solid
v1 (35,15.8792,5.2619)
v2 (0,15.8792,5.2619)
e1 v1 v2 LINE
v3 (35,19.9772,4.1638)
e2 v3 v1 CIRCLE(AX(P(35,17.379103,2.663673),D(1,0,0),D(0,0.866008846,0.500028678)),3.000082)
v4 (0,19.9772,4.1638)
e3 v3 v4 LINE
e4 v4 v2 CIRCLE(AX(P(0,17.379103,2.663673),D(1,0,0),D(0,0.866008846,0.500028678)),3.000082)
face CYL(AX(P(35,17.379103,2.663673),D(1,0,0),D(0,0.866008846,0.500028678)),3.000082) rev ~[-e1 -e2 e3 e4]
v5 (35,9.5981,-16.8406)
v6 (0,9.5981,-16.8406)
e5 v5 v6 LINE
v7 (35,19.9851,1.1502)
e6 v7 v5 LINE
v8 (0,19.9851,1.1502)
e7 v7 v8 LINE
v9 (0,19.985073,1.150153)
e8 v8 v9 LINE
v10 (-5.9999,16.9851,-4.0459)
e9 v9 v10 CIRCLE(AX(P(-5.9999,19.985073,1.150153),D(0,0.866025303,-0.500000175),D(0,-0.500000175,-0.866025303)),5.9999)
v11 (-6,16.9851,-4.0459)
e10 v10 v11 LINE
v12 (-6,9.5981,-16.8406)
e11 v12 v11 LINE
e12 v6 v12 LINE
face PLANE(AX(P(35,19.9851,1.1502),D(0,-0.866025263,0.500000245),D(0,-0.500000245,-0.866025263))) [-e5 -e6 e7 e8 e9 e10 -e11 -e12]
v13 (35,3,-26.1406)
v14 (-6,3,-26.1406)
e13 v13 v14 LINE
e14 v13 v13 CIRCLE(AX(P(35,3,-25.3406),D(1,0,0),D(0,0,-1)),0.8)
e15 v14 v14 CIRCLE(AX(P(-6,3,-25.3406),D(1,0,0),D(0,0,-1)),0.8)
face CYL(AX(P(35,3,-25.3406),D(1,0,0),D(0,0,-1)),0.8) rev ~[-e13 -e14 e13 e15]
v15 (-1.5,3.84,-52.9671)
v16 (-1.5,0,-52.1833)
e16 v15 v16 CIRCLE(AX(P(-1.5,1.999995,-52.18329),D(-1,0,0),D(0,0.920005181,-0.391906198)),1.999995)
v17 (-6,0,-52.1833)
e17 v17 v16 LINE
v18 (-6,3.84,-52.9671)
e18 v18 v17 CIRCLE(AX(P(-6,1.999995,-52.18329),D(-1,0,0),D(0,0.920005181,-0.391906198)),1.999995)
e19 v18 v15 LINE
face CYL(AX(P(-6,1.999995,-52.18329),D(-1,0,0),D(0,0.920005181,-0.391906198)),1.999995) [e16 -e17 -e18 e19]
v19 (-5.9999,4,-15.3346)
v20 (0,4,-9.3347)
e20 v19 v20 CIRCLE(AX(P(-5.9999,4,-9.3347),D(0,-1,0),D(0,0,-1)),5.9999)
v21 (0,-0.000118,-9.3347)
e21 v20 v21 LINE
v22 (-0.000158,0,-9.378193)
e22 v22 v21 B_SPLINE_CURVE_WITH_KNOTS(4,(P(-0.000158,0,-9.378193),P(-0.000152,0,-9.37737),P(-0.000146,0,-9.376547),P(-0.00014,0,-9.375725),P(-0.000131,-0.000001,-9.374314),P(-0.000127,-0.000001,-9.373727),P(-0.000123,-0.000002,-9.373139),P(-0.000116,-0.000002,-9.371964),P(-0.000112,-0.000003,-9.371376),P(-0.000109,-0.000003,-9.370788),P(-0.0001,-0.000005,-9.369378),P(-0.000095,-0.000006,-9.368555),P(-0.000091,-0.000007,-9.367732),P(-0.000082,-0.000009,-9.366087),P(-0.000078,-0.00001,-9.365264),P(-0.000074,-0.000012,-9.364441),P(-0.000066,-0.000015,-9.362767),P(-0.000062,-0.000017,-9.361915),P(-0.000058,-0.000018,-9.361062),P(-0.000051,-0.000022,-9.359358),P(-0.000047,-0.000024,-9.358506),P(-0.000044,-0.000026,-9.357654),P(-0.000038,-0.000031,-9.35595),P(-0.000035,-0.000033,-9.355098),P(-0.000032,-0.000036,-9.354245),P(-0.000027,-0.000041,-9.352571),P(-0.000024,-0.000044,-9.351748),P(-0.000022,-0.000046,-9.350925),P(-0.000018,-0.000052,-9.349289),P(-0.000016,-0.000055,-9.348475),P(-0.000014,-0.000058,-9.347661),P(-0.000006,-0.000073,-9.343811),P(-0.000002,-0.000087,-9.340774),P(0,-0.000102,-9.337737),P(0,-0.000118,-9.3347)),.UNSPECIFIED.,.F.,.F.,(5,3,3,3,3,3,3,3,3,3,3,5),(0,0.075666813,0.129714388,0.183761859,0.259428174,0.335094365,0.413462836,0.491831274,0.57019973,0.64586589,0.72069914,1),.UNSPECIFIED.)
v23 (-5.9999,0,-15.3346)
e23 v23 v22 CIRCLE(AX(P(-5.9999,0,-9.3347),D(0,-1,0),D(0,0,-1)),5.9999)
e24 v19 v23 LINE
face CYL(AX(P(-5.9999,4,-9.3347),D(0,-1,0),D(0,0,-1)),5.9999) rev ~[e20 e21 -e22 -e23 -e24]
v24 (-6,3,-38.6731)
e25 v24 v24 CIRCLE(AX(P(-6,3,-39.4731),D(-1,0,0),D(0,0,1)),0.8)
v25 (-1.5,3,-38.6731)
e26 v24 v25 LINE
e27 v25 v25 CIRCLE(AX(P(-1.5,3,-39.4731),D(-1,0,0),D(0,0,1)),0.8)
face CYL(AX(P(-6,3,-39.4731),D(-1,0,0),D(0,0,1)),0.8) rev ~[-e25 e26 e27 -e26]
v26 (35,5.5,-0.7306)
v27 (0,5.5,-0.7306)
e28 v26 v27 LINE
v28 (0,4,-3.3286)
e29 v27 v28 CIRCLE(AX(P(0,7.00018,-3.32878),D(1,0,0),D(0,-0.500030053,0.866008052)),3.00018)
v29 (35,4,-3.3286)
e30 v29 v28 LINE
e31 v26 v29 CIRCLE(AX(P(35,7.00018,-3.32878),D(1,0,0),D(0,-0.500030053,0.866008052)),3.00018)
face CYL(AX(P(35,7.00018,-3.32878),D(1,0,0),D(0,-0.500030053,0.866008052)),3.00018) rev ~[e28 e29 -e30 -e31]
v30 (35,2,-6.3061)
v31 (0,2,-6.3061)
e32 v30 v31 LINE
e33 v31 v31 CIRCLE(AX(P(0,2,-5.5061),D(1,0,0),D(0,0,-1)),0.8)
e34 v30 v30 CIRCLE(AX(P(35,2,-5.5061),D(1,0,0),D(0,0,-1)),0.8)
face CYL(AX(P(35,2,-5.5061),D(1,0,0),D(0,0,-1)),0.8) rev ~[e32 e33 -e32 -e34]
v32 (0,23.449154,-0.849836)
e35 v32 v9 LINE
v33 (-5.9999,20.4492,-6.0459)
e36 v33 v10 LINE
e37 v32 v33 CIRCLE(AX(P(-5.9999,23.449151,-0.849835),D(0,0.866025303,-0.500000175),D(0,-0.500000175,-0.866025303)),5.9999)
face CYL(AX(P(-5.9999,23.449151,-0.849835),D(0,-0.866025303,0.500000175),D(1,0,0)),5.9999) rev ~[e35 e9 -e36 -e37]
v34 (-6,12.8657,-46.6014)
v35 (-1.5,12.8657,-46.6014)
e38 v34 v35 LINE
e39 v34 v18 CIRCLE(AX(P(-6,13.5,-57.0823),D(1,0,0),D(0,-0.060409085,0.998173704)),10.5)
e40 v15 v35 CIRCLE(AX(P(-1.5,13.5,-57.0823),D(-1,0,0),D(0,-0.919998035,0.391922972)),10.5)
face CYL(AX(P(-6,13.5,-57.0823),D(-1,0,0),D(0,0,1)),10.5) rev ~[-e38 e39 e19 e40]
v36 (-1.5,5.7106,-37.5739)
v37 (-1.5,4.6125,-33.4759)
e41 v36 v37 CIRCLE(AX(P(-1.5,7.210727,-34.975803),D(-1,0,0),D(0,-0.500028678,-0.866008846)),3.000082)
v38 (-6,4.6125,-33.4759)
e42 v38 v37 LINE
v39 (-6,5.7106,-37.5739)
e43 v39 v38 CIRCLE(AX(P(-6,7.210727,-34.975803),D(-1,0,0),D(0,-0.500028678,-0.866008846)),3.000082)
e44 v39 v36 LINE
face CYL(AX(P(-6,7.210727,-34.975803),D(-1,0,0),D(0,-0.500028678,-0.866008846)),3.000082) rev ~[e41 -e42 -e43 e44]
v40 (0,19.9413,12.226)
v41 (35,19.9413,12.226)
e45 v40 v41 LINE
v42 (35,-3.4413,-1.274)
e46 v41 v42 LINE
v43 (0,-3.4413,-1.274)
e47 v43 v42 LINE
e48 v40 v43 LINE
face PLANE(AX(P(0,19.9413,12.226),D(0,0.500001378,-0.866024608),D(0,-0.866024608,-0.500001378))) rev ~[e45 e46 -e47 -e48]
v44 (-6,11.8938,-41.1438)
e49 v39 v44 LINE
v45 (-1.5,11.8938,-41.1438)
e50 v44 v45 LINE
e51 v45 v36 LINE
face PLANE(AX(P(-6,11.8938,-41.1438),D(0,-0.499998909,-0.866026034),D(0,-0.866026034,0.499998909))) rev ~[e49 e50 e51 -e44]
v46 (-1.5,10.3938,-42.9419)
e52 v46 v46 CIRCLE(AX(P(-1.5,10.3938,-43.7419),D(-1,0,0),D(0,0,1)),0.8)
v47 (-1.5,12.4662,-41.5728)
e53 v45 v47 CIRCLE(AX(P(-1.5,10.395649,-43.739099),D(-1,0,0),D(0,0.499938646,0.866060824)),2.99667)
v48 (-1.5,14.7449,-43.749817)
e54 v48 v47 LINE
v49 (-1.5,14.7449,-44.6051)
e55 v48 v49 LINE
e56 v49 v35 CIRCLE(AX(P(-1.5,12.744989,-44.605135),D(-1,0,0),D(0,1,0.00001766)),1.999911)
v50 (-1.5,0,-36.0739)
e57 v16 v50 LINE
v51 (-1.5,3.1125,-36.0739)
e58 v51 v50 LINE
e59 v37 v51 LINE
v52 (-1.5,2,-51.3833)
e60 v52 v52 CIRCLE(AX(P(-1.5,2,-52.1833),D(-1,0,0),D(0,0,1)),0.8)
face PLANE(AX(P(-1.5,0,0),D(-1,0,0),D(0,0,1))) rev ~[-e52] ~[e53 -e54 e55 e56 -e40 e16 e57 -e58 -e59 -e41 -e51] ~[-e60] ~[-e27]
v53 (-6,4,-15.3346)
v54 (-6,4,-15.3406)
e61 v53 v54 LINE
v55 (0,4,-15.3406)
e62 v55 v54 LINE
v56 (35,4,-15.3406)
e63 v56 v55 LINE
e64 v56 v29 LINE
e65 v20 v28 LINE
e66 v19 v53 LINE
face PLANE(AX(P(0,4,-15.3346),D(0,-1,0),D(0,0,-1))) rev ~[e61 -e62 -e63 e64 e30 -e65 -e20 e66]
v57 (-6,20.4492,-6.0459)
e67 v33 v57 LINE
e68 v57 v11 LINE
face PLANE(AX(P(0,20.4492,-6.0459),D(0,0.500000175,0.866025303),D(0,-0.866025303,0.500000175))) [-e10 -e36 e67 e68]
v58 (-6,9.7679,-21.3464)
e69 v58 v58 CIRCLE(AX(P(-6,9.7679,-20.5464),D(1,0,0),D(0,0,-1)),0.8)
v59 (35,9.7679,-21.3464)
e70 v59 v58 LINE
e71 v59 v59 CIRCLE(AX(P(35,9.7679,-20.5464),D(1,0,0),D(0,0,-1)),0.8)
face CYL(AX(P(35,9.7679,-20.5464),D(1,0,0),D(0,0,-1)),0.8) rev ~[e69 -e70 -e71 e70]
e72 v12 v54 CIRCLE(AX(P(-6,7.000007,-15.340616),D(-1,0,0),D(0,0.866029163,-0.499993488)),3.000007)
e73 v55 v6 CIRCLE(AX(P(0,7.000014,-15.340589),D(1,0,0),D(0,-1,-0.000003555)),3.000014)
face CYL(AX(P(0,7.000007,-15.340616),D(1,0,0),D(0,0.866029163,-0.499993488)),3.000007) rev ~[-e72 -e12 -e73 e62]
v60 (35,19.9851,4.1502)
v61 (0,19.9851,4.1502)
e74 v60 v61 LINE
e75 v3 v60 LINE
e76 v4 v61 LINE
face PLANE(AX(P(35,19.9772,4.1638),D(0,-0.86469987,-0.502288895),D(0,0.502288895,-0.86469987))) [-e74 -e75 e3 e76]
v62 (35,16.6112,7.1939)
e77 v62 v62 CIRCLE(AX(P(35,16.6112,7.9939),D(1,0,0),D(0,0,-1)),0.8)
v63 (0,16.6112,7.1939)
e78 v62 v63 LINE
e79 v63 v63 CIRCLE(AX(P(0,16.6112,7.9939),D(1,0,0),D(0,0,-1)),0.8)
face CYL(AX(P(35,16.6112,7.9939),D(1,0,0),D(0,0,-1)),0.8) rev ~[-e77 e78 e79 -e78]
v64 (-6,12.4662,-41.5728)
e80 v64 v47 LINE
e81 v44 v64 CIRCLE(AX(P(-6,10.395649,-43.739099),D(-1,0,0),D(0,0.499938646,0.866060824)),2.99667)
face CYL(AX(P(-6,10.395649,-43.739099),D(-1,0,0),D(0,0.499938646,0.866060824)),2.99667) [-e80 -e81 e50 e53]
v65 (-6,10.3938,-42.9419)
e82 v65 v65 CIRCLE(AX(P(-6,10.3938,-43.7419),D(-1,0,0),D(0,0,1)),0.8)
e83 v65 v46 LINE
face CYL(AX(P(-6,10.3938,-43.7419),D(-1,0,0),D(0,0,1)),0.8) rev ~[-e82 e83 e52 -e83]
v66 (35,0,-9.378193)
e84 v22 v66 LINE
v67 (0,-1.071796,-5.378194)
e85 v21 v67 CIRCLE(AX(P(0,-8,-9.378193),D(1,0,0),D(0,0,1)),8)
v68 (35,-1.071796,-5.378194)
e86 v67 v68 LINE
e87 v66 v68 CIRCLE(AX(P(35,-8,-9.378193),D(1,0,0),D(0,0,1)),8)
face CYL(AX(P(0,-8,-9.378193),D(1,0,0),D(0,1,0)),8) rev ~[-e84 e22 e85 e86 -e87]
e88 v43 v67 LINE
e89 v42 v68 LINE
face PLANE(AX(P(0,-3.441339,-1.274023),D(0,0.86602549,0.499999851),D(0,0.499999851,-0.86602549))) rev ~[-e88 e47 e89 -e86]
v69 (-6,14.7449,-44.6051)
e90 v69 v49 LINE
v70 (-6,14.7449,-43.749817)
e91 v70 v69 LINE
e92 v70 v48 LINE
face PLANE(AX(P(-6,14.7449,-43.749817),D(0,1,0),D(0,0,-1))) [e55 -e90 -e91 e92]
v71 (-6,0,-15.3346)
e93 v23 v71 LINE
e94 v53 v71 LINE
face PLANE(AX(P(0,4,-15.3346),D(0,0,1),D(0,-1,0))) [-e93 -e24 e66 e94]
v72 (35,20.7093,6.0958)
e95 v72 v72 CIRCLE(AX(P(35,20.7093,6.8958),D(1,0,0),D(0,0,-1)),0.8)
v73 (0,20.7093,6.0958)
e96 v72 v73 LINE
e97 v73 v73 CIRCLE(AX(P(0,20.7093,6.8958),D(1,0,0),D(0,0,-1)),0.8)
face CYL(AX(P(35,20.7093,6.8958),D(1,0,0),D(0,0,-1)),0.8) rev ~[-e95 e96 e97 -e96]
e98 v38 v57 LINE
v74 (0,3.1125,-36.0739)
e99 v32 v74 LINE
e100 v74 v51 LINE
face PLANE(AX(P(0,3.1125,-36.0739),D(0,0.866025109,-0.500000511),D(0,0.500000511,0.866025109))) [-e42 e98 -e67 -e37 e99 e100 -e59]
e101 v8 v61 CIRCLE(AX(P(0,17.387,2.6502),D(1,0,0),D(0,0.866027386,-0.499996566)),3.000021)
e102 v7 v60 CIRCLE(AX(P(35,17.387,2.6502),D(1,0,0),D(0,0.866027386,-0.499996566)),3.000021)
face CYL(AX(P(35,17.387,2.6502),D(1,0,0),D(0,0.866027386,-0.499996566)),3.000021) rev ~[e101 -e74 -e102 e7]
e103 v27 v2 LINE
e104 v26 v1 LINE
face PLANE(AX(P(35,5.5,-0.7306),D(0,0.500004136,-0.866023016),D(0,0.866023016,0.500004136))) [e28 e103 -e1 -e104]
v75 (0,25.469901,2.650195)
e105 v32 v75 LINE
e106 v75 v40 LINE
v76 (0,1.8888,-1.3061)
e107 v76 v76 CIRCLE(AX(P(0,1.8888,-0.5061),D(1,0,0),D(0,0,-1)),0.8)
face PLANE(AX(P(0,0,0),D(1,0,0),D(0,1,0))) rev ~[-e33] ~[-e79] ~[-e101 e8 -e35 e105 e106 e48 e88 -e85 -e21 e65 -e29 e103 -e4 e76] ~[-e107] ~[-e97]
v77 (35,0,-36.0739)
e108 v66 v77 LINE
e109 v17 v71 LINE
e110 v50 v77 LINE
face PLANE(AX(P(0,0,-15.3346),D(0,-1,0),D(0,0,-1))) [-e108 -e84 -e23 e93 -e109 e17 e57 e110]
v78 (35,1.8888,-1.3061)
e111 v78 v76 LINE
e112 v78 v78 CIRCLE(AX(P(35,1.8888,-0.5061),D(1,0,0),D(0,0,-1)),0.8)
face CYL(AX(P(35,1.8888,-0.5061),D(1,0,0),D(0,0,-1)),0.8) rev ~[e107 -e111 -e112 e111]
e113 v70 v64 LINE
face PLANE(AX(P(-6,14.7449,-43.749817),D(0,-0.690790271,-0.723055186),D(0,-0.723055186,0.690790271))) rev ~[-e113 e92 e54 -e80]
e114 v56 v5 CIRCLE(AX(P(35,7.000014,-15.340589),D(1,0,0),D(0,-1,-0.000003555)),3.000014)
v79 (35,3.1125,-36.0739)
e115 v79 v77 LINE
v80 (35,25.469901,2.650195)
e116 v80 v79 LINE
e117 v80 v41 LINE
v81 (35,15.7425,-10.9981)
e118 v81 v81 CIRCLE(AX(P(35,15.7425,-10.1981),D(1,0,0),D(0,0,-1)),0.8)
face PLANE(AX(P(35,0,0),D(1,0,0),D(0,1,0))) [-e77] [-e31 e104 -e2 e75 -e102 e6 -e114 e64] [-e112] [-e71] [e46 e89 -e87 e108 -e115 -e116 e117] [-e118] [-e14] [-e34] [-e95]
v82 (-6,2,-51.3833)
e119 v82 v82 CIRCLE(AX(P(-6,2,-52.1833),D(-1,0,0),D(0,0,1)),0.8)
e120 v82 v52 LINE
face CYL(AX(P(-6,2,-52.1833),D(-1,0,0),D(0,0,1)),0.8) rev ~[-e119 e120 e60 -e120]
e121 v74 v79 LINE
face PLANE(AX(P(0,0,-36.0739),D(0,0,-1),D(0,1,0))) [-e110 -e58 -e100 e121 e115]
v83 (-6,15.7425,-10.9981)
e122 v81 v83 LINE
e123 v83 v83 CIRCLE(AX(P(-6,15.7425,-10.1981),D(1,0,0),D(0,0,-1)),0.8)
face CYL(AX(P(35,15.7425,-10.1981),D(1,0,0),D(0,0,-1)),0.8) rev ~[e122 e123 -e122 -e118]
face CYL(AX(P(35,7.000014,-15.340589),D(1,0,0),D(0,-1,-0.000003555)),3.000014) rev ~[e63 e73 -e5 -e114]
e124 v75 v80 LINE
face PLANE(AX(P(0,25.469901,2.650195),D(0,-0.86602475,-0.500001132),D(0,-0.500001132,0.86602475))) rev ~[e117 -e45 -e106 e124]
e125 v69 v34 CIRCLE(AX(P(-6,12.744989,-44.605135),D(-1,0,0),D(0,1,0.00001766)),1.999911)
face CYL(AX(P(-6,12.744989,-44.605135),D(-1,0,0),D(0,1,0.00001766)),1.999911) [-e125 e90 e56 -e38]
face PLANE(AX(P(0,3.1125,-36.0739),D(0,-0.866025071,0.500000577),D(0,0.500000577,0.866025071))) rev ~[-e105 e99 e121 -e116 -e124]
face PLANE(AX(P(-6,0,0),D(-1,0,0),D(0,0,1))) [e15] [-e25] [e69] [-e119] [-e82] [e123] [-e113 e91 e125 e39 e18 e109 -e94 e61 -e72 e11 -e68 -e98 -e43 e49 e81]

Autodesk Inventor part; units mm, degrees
ref_plane "YZ Plane" through (0, 0, 0) normal (1, 0, 0) x (0, 1, 0)
ref_plane "XZ Plane" through (0, 0, 0) normal (0, 1, 0) x (-1, 0, 0)
sketch "スケッチ1" plane through (0, 0, 0) normal (1, 0, 0) x (0, 1, 0)
  line L0 (27, 0) -> (0, 0)
  line L1 (0, 0) -> (0, -65.8723)
  line L2 (0, -65.8723) -> (27, -65.8723)
  line L3 (27, -65.8723) -> (27, -2.1436)
  line L4 (25.9282, 1.8564) -> (7.2963, 34.1277)
  line L5 (7.2963, 34.1277) -> (-16.0863, 20.6277)
  line L6 (-16.0863, 20.6277) -> (0, -7.2346)
  line L7 (0, 19.7654) -> (-4.395, 27.3777)
  circle A0 centre (0, 19.7654) radius 4.25
  circle A1 centre (13.5, -57.0823) radius 4.25
  line L8 (13.5, -65.8723) -> (13.5, -57.0823)
  circle A2 centre (0, 19.7654) radius 13.5
  circle A3 centre (13.5, -57.0823) radius 13.5
  circle A4 centre (0, 19.7654) radius 6
  circle A5 centre (13.5, -57.0823) radius 6
  circle A6 centre (-3, 24.9615) radius 1
  circle A7 centre (-5.7956, 21.3183) radius 1
  circle A8 centre (-5.1962, 16.7654) radius 1
  circle A9 centre (-1.5529, 13.9698) radius 1
  circle A10 centre (3, 14.5692) radius 1
  circle A11 centre (5.7956, 18.2125) radius 1
  circle A12 centre (13.5, -63.0823) radius 1
  circle A13 centre (17.7426, -61.3249) radius 1
  circle A14 centre (19.5, -57.0823) radius 1
  circle A15 centre (17.7426, -52.8396) radius 1
  circle A16 centre (13.5, -51.0823) radius 1
  circle A17 centre (9.2574, -52.8396) radius 1
  circle A18 centre (7.5, -57.0823) radius 1
  circle A19 centre (9.2574, -61.3249) radius 1
  circle A20 centre (5.1962, 22.7654) radius 1
  circle A21 centre (1.5529, 25.5609) radius 1
  line L9 (13.5, -57.0823) -> (50.1936, 6.4729)
  line L10 (13.5, -57.0823) -> (5.7058, -52.5823)
  line L11 (12.2058, -41.3239) -> (-0.7942, -63.8406)
  line L12 (12.2058, -41.3239) -> (3.1125, -36.0739)
  line L13 (3.1125, -36.0739) -> (27, 5.3004)
  line L14 (19.9413, 12.226) -> (-3.4413, -1.274)
  line L15 (3.1125, -36.0739) -> (0, -36.0739)
  arc A22 (27, -2.1436) -> (25.9282, 1.8564) centre (19, -2.1436) ccw
  point P0 (-14.7211, 28.9596)
  point P1 (-3.0298, -41.1381)
  point P2 (23.9702, -41.1381)
  point P3 (8.6616, 42.4596)
  point P4 (25.4699, 2.6502)
  point P5 (0, -57.0823)
  point P6 (10.7369, -43.8681)
  dimension "d11" = 12
  dimension "d12" = 12
  dimension "d4" = 27
  dimension "d5" = 150
  dimension "d6" = 27
  dimension "d7" = 8.79
  dimension "d8" = 100
  dimension "d9" = 8.79
  dimension "d10" = 8.5
  dimension "d13" = 2
  dimension "d14" = 360
  dimension "d15" = 2
  dimension "d16" = 360
  dimension "d17" = 39.4073
  dimension "d18" = 9
  dimension "d19" = 13
  dimension "d20" = 30
  dimension "d22" = 19.5
  dimension "d24" = 16.5
  dimension "d28" = 8
extrude "押し出し1" add sketch "スケッチ1" along normal blind 35 contours L13 L15 L1 L0 | L0 L1 L6 L14 L4 L13
fillet "フィレット1" radius 8 1 edges at (17.5, 0, -7.2346)
sketch "スケッチ2" plane through (35, 0, 0) normal (1, 0, 0) x (0, 0, -1)
  line L0 (21.5464, 11.5) -> (9.5919, 18.4019) projected
  arc A0 (11.0919, 24) -> (9.5919, 18.4019) centre (11.0919, 21) ccw projected
  line L1 (11.0919, 24) -> (27.0312, 24) projected
  arc A1 (29.6293, 19.5) -> (27.0312, 24) centre (27.0312, 21) ccw projected
  line L2 (29.6293, 19.5) -> (25.6444, 12.5981) projected
  arc A2 (21.5464, 11.5) -> (25.6444, 12.5981) centre (23.0464, 14.0981) ccw projected
  line L3 (-15.2943, 14.7058) -> (-13.324, 15.8433) projected
  arc A3 (-9.226, 14.7452) -> (-13.324, 15.8433) centre (-11.824, 13.2452) ccw projected
  line L4 (-9.226, 14.7452) -> (-1.726, 1.7548) projected
  arc A4 (-2.824, -2.3433) -> (-1.726, 1.7548) centre (-4.324, 0.2548) ccw projected
  line L5 (-2.824, -2.3433) -> (-4.7943, -3.4808) projected
  arc A5 (-9.2878, -0.6865) -> (-4.7943, -3.4808) centre (-6.2943, -0.8827) ccw projected
  arc A6 (-9.2878, -0.6865) -> (-15.1212, 9.4171) centre (-19.7654, 0) ccw projected
  arc A7 (-15.2943, 14.7058) -> (-15.1212, 9.4171) centre (-13.7943, 12.1077) ccw projected
  line L6 (45.8573, 3) -> (37.0726, 3) projected
  arc A8 (35.5726, 3.4019) -> (37.0726, 3) centre (37.0726, 6) ccw projected
  line L7 (35.5726, 3.4019) -> (31.9387, 5.5) projected
  arc A9 (30.8406, 9.5981) -> (31.9387, 5.5) centre (33.4387, 8.0981) ccw projected
  line L8 (30.8406, 9.5981) -> (38.2895, 22.5) projected
  arc A10 (40.8876, 24) -> (38.2895, 22.5) centre (40.8876, 21) ccw projected
  line L9 (40.8876, 24) -> (45.8573, 24) projected
  arc A11 (48.3517, 19.3333) -> (45.8573, 24) centre (45.8573, 21) ccw projected
  arc A12 (48.3517, 19.3333) -> (48.3517, 7.6667) centre (57.0823, 13.5) ccw projected
  arc A13 (45.8573, 3) -> (48.3517, 7.6667) centre (45.8573, 6) ccw projected
  line L10 (-1.1502, 19.9851) -> (16.8406, 9.5981) projected
  arc A14 (15.3406, 4) -> (16.8406, 9.5981) centre (15.3406, 7) ccw projected
  line L11 (15.3406, 4) -> (3.3286, 4) projected
  arc A15 (0.7306, 5.5) -> (3.3286, 4) centre (3.3286, 7) ccw projected
  line L12 (0.7306, 5.5) -> (-5.2619, 15.8792) projected
  arc A16 (-4.1638, 19.9772) -> (-5.2619, 15.8792) centre (-2.6638, 17.3792) ccw projected
  line L13 (-4.1638, 19.9772) -> (-4.1502, 19.9851) projected
  arc A17 (-1.1502, 19.9851) -> (-4.1502, 19.9851) centre (-2.6502, 17.387) ccw projected
  arc A18 (57.3667, 17.7405) -> (59.3483, 18.9706) centre (57.5005, 19.736) ccw projected
  line L14 (59.3483, 18.9706) -> (59.8105, 20.0866) projected
  arc A19 (59.8105, 20.0866) -> (55.1911, 27) centre (55.1911, 22) ccw projected
  line L15 (55.1911, 27) -> (2.1436, 27) projected
  arc A20 (2.1436, 27) -> (-1.8564, 25.9282) centre (2.1436, 19) ccw projected
  line L16 (-1.8564, 25.9282) -> (-24.8776, 12.6369) projected
  arc A21 (-24.8776, 12.6369) -> (-25.4214, 4.34) centre (-22.3776, 8.3068) ccw projected
  line L17 (-25.4214, 4.34) -> (-24.4631, 3.6047) projected
  arc A22 (-24.4631, 3.6047) -> (-22.1319, 3.5302) centre (-23.2456, 5.1914) ccw projected
  arc A23 (-17.8914, -3.8146) -> (-22.1319, 3.5302) centre (-19.7654, 0) ccw projected
  arc A24 (-17.8914, -3.8146) -> (-18.9925, -5.8707) centre (-17.0096, -5.6096) ccw projected
  line L18 (-18.9925, -5.8707) -> (-18.8348, -7.0683) projected
  arc A25 (-18.8348, -7.0683) -> (-11.3776, -10.7458) centre (-13.8776, -6.4156) ccw projected
  line L19 (-11.3776, -10.7458) -> (5.3782, -1.0718) projected
  arc A26 (9.3782, 0) -> (5.3782, -1.0718) centre (9.3782, -8) ccw projected
  line L20 (9.3782, 0) -> (55.1911, 0) projected
  arc A27 (55.1911, 0) -> (59.8105, 6.9134) centre (55.1911, 5) ccw projected
  line L21 (59.8105, 6.9134) -> (59.3483, 8.0294) projected
  arc A28 (59.3483, 8.0294) -> (57.3667, 9.2595) centre (57.5005, 7.264) ccw projected
  arc A29 (57.3667, 17.7405) -> (57.3667, 9.2595) centre (57.0823, 13.5) ccw projected
  circle A30 centre (-22.7654, 5.1962) radius 1 projected
  circle A31 centre (-18.2125, 5.7956) radius 1 projected
  circle A32 centre (-14.5692, 3) radius 1 projected
  circle A33 centre (-13.9698, -1.5529) radius 1 projected
  circle A34 centre (-16.7654, -5.1962) radius 1 projected
  circle A35 centre (57.0823, 19.5) radius 1 projected
  circle A36 centre (52.8396, 17.7426) radius 1 projected
  circle A37 centre (51.0823, 13.5) radius 1 projected
  circle A38 centre (52.8396, 9.2574) radius 1 projected
  circle A39 centre (57.0823, 7.5) radius 1 projected
  circle A40 centre (5.5061, 2) radius 1 projected
  circle A41 centre (10.1981, 15.7425) radius 1 projected
  circle A42 centre (25.3406, 3) radius 1 projected
  circle A43 centre (0.5061, 1.8888) radius 1 projected
  circle A44 centre (20.5464, 9.7679) radius 1 projected
  circle A45 centre (-7.9939, 16.6112) radius 1 projected
  circle A46 centre (-6.8958, 20.7093) radius 1 projected
  point P0 (0, 0)
extrude "押し出し2" cut sketch "スケッチ2" against normal through all contours L10 A14 L11 A15 L12 A16 L13 A17
sketch "スケッチ3" plane through (0, 0, 0) normal (-1, 0, 0) x (0, 0, 1)
  arc A0 (-3.3286, 4) -> (-0.7306, 5.5) centre (-3.3286, 7) ccw projected
  line L0 (-3.3286, 4) -> (-15.3406, 4) projected
  arc A1 (-16.8406, 9.5981) -> (-15.3406, 4) centre (-15.3406, 7) ccw projected
  line L1 (-16.8406, 9.5981) -> (1.1502, 19.9851) projected
  arc A2 (4.1502, 19.9851) -> (1.1502, 19.9851) centre (2.6502, 17.387) ccw projected
  line L2 (4.1502, 19.9851) -> (4.1638, 19.9772) projected
  arc A3 (5.2619, 15.8792) -> (4.1638, 19.9772) centre (2.6638, 17.3792) ccw projected
  line L3 (5.2619, 15.8792) -> (-0.7306, 5.5) projected
  line L4 (-36.0739, 3.1125) -> (2.6502, 25.4699) projected
  line L5 (-36.0739, 0) -> (-36.0739, 3.1125) projected
  line L6 (-9.3782, 0) -> (-36.0739, 0) projected
  arc A4 (-5.3782, -1.0718) -> (-9.3782, 0) centre (-9.3782, -8) ccw projected
  line L7 (-1.274, -3.4413) -> (-5.3782, -1.0718) projected
  line L8 (12.226, 19.9413) -> (-1.274, -3.4413) projected
  line L9 (2.6502, 25.4699) -> (12.226, 19.9413) projected
  line L10 (1.1502, 19.9851) -> (-0.8498, 23.4492)
  line L11 (-6.0459, 20.4492) -> (-4.0459, 16.9851)
  line L12 (-15.3346, 4) -> (-15.3346, 0)
  line L13 (-3.3286, 4) -> (-15.3406, 4) projected
  line L14 (-9.3782, 0) -> (-9.3782, 4)
  point P0 (0, 0)
  point P1 (-9.3346, 4)
  dimension "d33" = 6
  dimension "d34" = 6
extrude "押し出し3" add sketch "スケッチ3" along normal blind 6 contours L12 L6 L5 L4 L11 L1 A1 L0
fillet "フィレット2" radius 6 2 edges at (0, 18.7171, -5.0459) (0, 2, -15.3346)
sketch "スケッチ4" plane through (-6, 0, 0) normal (-1, 0, 0) x (0, 0, 1)
  arc A0 (-39.4731, 0) -> (-36.875, 4.5) centre (-39.4731, 3) ccw projected
  line L0 (-39.4731, 0) -> (-55.1911, 0) projected
  arc A1 (-59.8105, 6.9134) -> (-55.1911, 0) centre (-55.1911, 5) ccw projected
  line L1 (-59.8105, 6.9134) -> (-59.3483, 8.0294) projected
  arc A2 (-57.3667, 9.2595) -> (-59.3483, 8.0294) centre (-57.5005, 7.264) ccw projected
  arc A3 (-57.3667, 9.2595) -> (-57.3667, 17.7405) centre (-57.0823, 13.5) ccw projected
  arc A4 (-59.3483, 18.9706) -> (-57.3667, 17.7405) centre (-57.5005, 19.736) ccw projected
  line L2 (-59.3483, 18.9706) -> (-59.7128, 19.8506) projected
  arc A5 (-56.8847, 23.9981) -> (-59.7128, 19.8506) centre (-56.9411, 20.9987) ccw projected
  arc A6 (-49.4902, 20.7534) -> (-56.8847, 23.9981) centre (-57.0823, 13.5) ccw projected
  line L3 (-49.4902, 20.7534) -> (-41.5728, 12.4662) projected
  arc A7 (-41.1438, 11.8938) -> (-41.5728, 12.4662) centre (-43.7419, 10.3938) ccw projected
  line L4 (-41.1438, 11.8938) -> (-36.875, 4.5) projected
  circle A8 centre (-57.0823, 19.5) radius 1 projected
  circle A9 centre (-52.8396, 17.7426) radius 1 projected
  circle A10 centre (-51.0823, 13.5) radius 1 projected
  circle A11 centre (-52.8396, 9.2574) radius 1 projected
  circle A12 centre (-57.0823, 7.5) radius 1 projected
  circle A13 centre (-57.0823, 13.5) radius 10.5
  arc A14 (-50.4826, 5.3333) -> (-46.6014, 12.8657) centre (-57.0823, 13.5) ccw projected
  arc A15 (-44.6051, 14.7449) -> (-46.6014, 12.8657) centre (-44.6051, 12.7449) ccw projected
  arc A16 (-52.9671, 3.84) -> (-46.6014, 12.8657) centre (-57.0823, 13.5) ccw projected
  arc A17 (-52.9671, 3.84) -> (-52.1833, 0) centre (-52.1833, 2) ccw projected
  line L5 (-15.3782, 0) -> (-52.1833, 0) projected
  line L6 (-15.3782, 0) -> (-15.3782, 4.0002) projected
  arc A18 (-16.8406, 9.5981) -> (-15.3782, 4.0002) centre (-15.3406, 7) ccw projected
  line L7 (-16.8406, 9.5981) -> (-4.0459, 16.9851) projected
  line L8 (-4.0459, 16.9851) -> (-6.0459, 20.4492) projected
  line L9 (-6.0459, 20.4492) -> (-15.926, 14.7449) projected
  line L10 (-15.926, 14.7449) -> (-44.6051, 14.7449) projected
  line L11 (-36.3155, 12.5308) -> (-30.9571, 12.5308) projected
  arc A19 (-29.4571, 6.9328) -> (-30.9571, 12.5308) centre (-30.9571, 9.5308) ccw projected
  line L12 (-29.4571, 6.9328) -> (-33.4759, 4.6125) projected
  arc A20 (-37.5739, 5.7106) -> (-33.4759, 4.6125) centre (-34.9759, 7.2106) ccw projected
  line L13 (-37.5739, 5.7106) -> (-38.9135, 8.0308) projected
  arc A21 (-36.3155, 12.5308) -> (-38.9135, 8.0308) centre (-36.3155, 9.5308) ccw projected
  arc A22 (-44.6051, 14.7449) -> (-46.6014, 12.8657) centre (-44.6051, 12.7449) ccw projected
  arc A23 (-52.9671, 3.84) -> (-46.6014, 12.8657) centre (-57.0823, 13.5) ccw projected
  arc A24 (-52.9671, 3.84) -> (-52.1833, 0) centre (-52.1833, 2) ccw projected
  line L14 (-15.3782, 0) -> (-52.1833, 0) projected
  line L15 (-15.3782, 0) -> (-15.3782, 4.0002) projected
  arc A25 (-16.8406, 9.5981) -> (-15.3782, 4.0002) centre (-15.3406, 7) ccw projected
  line L16 (-16.8406, 9.5981) -> (-4.0459, 16.9851) projected
  line L17 (-4.0459, 16.9851) -> (-6.0459, 20.4492) projected
  line L18 (-6.0459, 20.4492) -> (-15.926, 14.7449) projected
  line L19 (-15.926, 14.7449) -> (-44.6051, 14.7449) projected
  line L20 (-36.3155, 12.5308) -> (-30.9571, 12.5308) projected
  arc A26 (-29.4571, 6.9328) -> (-30.9571, 12.5308) centre (-30.9571, 9.5308) ccw projected
  line L21 (-29.4571, 6.9328) -> (-33.4759, 4.6125) projected
  arc A27 (-37.5739, 5.7106) -> (-33.4759, 4.6125) centre (-34.9759, 7.2106) ccw projected
  line L22 (-37.5739, 5.7106) -> (-38.9135, 8.0308) projected
  arc A28 (-36.3155, 12.5308) -> (-38.9135, 8.0308) centre (-36.3155, 9.5308) ccw projected
  line L23 (-6.0459, 20.4492) -> (-36.0739, 3.1125) projected
  line L24 (-36.0739, 3.1125) -> (-36.0739, 0) projected
  circle A29 centre (-52.1833, 2) radius 1 projected
  circle A30 centre (-39.4731, 3) radius 1 projected
  circle A31 centre (-43.7419, 10.3938) radius 1 projected
  circle A32 centre (-10.1981, 15.7425) radius 1 projected
  circle A33 centre (-20.5464, 9.7679) radius 1 projected
  circle A34 centre (-25.3406, 3) radius 1 projected
  circle A35 centre (-52.1833, 2) radius 1 projected
  circle A36 centre (-39.4731, 3) radius 1 projected
  circle A37 centre (-43.7419, 10.3938) radius 1 projected
  circle A38 centre (-10.1981, 15.7425) radius 1 projected
  circle A39 centre (-20.5464, 9.7679) radius 1 projected
  circle A40 centre (-25.3406, 3) radius 1 projected
  point P0 (-48.6288, 19.8517)
  point P1 (-56.8847, 23.9981)
  point P2 (-59.9256, 3.3923)
  point P3 (-56.8847, 23.9981)
  point P4 (-43.7498, 14.7449)
  point P5 (-46.6012, 12.8697)
  point P6 (-52.9703, 3.8386)
  point P7 (-37.5718, 5.7069)
  point P8 (-39.4697, 0)
ref_plane "作業平面1" through (-1.5, -10.2702, -70.5828) normal (-1, 0, 0) x (0, 0, 1)
extrude "押し出し4" add sketch "スケッチ4" against normal up to surface (4.5 mm away) contours L0 A17 A13 A15 L10 L3 A7 L4 A0 | A0 L4 A20 L23 L24 L5 | A29 | A30 | A31
sketch "スケッチ5" plane through (35, 0, 0) normal (1, 0, 0) x (0, 0, -1)
  line L0 (36.0739, 3.1125) -> (-2.6502, 25.4699) projected
  circle A0 centre (5.5061, 2) radius 1 construction
  circle A1 centre (10.1981, 15.7425) radius 1 construction
  circle A2 centre (25.3406, 3) radius 1 construction
  circle A3 centre (0.5061, 1.8888) radius 1 construction
  circle A4 centre (20.5464, 9.7679) radius 1 construction
  circle A5 centre (-7.9939, 16.6112) radius 1 construction
  circle A6 centre (-6.8958, 20.7093) radius 1 construction
  line L1 (21.5464, 11.5) -> (9.5919, 18.4019) projected
  arc A7 (11.0919, 24) -> (9.5919, 18.4019) centre (11.0919, 21) ccw projected
  line L2 (11.0919, 24) -> (27.0312, 24) projected
  arc A8 (29.6293, 19.5) -> (27.0312, 24) centre (27.0312, 21) ccw projected
  line L3 (29.6293, 19.5) -> (25.6444, 12.5981) projected
  arc A9 (21.5464, 11.5) -> (25.6444, 12.5981) centre (23.0464, 14.0981) ccw projected
  line L4 (-15.2943, 14.7058) -> (-13.324, 15.8433) projected
  arc A10 (-9.226, 14.7452) -> (-13.324, 15.8433) centre (-11.824, 13.2452) ccw projected
  line L5 (-9.226, 14.7452) -> (-1.726, 1.7548) projected
  arc A11 (-2.824, -2.3433) -> (-1.726, 1.7548) centre (-4.324, 0.2548) ccw projected
  line L6 (-2.824, -2.3433) -> (-4.7943, -3.4808) projected
  arc A12 (-9.2878, -0.6865) -> (-4.7943, -3.4808) centre (-6.2943, -0.8827) ccw projected
  arc A13 (-9.2878, -0.6865) -> (-15.1212, 9.4171) centre (-19.7654, 0) ccw projected
  arc A14 (-15.2943, 14.7058) -> (-15.1212, 9.4171) centre (-13.7943, 12.1077) ccw projected
  line L7 (45.8573, 3) -> (37.0726, 3) projected
  arc A15 (35.5726, 3.4019) -> (37.0726, 3) centre (37.0726, 6) ccw projected
  line L8 (35.5726, 3.4019) -> (31.9387, 5.5) projected
  arc A16 (30.8406, 9.5981) -> (31.9387, 5.5) centre (33.4387, 8.0981) ccw projected
  line L9 (30.8406, 9.5981) -> (38.2895, 22.5) projected
  arc A17 (40.8876, 24) -> (38.2895, 22.5) centre (40.8876, 21) ccw projected
  line L10 (40.8876, 24) -> (45.8573, 24) projected
  arc A18 (48.3517, 19.3333) -> (45.8573, 24) centre (45.8573, 21) ccw projected
  arc A19 (48.3517, 19.3333) -> (48.3517, 7.6667) centre (57.0823, 13.5) ccw projected
  arc A20 (45.8573, 3) -> (48.3517, 7.6667) centre (45.8573, 6) ccw projected
  line L11 (-1.1502, 19.9851) -> (16.8406, 9.5981) projected
  arc A21 (15.3406, 4) -> (16.8406, 9.5981) centre (15.3406, 7) ccw projected
  line L12 (15.3406, 4) -> (3.3286, 4) projected
  arc A22 (0.7306, 5.5) -> (3.3286, 4) centre (3.3286, 7) ccw projected
  line L13 (0.7306, 5.5) -> (-5.2619, 15.8792) projected
  arc A23 (-4.1638, 19.9772) -> (-5.2619, 15.8792) centre (-2.6638, 17.3792) ccw projected
  line L14 (-4.1638, 19.9772) -> (-4.1502, 19.9851) projected
  arc A24 (-1.1502, 19.9851) -> (-4.1502, 19.9851) centre (-2.6502, 17.387) ccw projected
  arc A25 (57.3667, 17.7405) -> (59.3483, 18.9706) centre (57.5005, 19.736) ccw projected
  line L15 (59.3483, 18.9706) -> (59.8105, 20.0866) projected
  arc A26 (59.8105, 20.0866) -> (55.1911, 27) centre (55.1911, 22) ccw projected
  line L16 (55.1911, 27) -> (2.1436, 27) projected
  arc A27 (2.1436, 27) -> (-1.8564, 25.9282) centre (2.1436, 19) ccw projected
  line L17 (-1.8564, 25.9282) -> (-24.8776, 12.6369) projected
  arc A28 (-24.8776, 12.6369) -> (-25.4214, 4.34) centre (-22.3776, 8.3068) ccw projected
  line L18 (-25.4214, 4.34) -> (-24.4631, 3.6047) projected
  arc A29 (-24.4631, 3.6047) -> (-22.1319, 3.5302) centre (-23.2456, 5.1914) ccw projected
  arc A30 (-17.8914, -3.8146) -> (-22.1319, 3.5302) centre (-19.7654, 0) ccw projected
  arc A31 (-17.8914, -3.8146) -> (-18.9925, -5.8707) centre (-17.0096, -5.6096) ccw projected
  line L19 (-18.9925, -5.8707) -> (-18.8348, -7.0683) projected
  arc A32 (-18.8348, -7.0683) -> (-11.3776, -10.7458) centre (-13.8776, -6.4156) ccw projected
  line L20 (-11.3776, -10.7458) -> (5.3782, -1.0718) projected
  arc A33 (9.3782, 0) -> (5.3782, -1.0718) centre (9.3782, -8) ccw projected
  line L21 (9.3782, 0) -> (55.1911, 0) projected
  arc A34 (55.1911, 0) -> (59.8105, 6.9134) centre (55.1911, 5) ccw projected
  line L22 (59.8105, 6.9134) -> (59.3483, 8.0294) projected
  arc A35 (59.3483, 8.0294) -> (57.3667, 9.2595) centre (57.5005, 7.264) ccw projected
  arc A36 (57.3667, 17.7405) -> (57.3667, 9.2595) centre (57.0823, 13.5) ccw projected
  circle A37 centre (-22.7654, 5.1962) radius 1 projected
  circle A38 centre (-18.2125, 5.7956) radius 1 projected
  circle A39 centre (-14.5692, 3) radius 1 projected
  circle A40 centre (-13.9698, -1.5529) radius 1 projected
  circle A41 centre (-16.7654, -5.1962) radius 1 projected
  circle A42 centre (57.0823, 19.5) radius 1 projected
  circle A43 centre (52.8396, 17.7426) radius 1 projected
  circle A44 centre (51.0823, 13.5) radius 1 projected
  circle A45 centre (52.8396, 9.2574) radius 1 projected
  circle A46 centre (57.0823, 7.5) radius 1 projected
  circle A47 centre (-6.8958, 20.7093) radius 0.8
  circle A48 centre (-7.9939, 16.6112) radius 0.8
  circle A49 centre (0.5061, 1.8888) radius 0.8
  circle A50 centre (5.5061, 2) radius 0.8
  circle A51 centre (25.3406, 3) radius 0.8
  circle A52 centre (20.5464, 9.7679) radius 0.8
  circle A53 centre (10.1981, 15.7425) radius 0.8
  point P0 (0, 0)
  dimension "d42" = 1.6
extrude "押し出し5" cut sketch "スケッチ5" against normal through all contours A47 | A48 | A49 | A50 | A51 | A52 | A53
sketch "スケッチ6" plane through (-6, 0, 0) normal (-1, 0, 0) x (0, 0, 1)
  circle A0 centre (-43.7419, 10.3938) radius 1 construction
  circle A1 centre (-39.4731, 3) radius 1 construction
  circle A2 centre (-52.1833, 2) radius 1 construction
  circle A3 centre (-43.7419, 10.3938) radius 0.8
  circle A4 centre (-39.4731, 3) radius 0.8
  circle A5 centre (-52.1833, 2) radius 0.8
  point P0 (0, 0)
  dimension "d43" = 1.6
  dimension "d44" = 1.6
  dimension "d45" = 1.6
extrude "押し出し6" cut sketch "スケッチ6" against normal through all
properties part number "leg_upper_middle_right"
